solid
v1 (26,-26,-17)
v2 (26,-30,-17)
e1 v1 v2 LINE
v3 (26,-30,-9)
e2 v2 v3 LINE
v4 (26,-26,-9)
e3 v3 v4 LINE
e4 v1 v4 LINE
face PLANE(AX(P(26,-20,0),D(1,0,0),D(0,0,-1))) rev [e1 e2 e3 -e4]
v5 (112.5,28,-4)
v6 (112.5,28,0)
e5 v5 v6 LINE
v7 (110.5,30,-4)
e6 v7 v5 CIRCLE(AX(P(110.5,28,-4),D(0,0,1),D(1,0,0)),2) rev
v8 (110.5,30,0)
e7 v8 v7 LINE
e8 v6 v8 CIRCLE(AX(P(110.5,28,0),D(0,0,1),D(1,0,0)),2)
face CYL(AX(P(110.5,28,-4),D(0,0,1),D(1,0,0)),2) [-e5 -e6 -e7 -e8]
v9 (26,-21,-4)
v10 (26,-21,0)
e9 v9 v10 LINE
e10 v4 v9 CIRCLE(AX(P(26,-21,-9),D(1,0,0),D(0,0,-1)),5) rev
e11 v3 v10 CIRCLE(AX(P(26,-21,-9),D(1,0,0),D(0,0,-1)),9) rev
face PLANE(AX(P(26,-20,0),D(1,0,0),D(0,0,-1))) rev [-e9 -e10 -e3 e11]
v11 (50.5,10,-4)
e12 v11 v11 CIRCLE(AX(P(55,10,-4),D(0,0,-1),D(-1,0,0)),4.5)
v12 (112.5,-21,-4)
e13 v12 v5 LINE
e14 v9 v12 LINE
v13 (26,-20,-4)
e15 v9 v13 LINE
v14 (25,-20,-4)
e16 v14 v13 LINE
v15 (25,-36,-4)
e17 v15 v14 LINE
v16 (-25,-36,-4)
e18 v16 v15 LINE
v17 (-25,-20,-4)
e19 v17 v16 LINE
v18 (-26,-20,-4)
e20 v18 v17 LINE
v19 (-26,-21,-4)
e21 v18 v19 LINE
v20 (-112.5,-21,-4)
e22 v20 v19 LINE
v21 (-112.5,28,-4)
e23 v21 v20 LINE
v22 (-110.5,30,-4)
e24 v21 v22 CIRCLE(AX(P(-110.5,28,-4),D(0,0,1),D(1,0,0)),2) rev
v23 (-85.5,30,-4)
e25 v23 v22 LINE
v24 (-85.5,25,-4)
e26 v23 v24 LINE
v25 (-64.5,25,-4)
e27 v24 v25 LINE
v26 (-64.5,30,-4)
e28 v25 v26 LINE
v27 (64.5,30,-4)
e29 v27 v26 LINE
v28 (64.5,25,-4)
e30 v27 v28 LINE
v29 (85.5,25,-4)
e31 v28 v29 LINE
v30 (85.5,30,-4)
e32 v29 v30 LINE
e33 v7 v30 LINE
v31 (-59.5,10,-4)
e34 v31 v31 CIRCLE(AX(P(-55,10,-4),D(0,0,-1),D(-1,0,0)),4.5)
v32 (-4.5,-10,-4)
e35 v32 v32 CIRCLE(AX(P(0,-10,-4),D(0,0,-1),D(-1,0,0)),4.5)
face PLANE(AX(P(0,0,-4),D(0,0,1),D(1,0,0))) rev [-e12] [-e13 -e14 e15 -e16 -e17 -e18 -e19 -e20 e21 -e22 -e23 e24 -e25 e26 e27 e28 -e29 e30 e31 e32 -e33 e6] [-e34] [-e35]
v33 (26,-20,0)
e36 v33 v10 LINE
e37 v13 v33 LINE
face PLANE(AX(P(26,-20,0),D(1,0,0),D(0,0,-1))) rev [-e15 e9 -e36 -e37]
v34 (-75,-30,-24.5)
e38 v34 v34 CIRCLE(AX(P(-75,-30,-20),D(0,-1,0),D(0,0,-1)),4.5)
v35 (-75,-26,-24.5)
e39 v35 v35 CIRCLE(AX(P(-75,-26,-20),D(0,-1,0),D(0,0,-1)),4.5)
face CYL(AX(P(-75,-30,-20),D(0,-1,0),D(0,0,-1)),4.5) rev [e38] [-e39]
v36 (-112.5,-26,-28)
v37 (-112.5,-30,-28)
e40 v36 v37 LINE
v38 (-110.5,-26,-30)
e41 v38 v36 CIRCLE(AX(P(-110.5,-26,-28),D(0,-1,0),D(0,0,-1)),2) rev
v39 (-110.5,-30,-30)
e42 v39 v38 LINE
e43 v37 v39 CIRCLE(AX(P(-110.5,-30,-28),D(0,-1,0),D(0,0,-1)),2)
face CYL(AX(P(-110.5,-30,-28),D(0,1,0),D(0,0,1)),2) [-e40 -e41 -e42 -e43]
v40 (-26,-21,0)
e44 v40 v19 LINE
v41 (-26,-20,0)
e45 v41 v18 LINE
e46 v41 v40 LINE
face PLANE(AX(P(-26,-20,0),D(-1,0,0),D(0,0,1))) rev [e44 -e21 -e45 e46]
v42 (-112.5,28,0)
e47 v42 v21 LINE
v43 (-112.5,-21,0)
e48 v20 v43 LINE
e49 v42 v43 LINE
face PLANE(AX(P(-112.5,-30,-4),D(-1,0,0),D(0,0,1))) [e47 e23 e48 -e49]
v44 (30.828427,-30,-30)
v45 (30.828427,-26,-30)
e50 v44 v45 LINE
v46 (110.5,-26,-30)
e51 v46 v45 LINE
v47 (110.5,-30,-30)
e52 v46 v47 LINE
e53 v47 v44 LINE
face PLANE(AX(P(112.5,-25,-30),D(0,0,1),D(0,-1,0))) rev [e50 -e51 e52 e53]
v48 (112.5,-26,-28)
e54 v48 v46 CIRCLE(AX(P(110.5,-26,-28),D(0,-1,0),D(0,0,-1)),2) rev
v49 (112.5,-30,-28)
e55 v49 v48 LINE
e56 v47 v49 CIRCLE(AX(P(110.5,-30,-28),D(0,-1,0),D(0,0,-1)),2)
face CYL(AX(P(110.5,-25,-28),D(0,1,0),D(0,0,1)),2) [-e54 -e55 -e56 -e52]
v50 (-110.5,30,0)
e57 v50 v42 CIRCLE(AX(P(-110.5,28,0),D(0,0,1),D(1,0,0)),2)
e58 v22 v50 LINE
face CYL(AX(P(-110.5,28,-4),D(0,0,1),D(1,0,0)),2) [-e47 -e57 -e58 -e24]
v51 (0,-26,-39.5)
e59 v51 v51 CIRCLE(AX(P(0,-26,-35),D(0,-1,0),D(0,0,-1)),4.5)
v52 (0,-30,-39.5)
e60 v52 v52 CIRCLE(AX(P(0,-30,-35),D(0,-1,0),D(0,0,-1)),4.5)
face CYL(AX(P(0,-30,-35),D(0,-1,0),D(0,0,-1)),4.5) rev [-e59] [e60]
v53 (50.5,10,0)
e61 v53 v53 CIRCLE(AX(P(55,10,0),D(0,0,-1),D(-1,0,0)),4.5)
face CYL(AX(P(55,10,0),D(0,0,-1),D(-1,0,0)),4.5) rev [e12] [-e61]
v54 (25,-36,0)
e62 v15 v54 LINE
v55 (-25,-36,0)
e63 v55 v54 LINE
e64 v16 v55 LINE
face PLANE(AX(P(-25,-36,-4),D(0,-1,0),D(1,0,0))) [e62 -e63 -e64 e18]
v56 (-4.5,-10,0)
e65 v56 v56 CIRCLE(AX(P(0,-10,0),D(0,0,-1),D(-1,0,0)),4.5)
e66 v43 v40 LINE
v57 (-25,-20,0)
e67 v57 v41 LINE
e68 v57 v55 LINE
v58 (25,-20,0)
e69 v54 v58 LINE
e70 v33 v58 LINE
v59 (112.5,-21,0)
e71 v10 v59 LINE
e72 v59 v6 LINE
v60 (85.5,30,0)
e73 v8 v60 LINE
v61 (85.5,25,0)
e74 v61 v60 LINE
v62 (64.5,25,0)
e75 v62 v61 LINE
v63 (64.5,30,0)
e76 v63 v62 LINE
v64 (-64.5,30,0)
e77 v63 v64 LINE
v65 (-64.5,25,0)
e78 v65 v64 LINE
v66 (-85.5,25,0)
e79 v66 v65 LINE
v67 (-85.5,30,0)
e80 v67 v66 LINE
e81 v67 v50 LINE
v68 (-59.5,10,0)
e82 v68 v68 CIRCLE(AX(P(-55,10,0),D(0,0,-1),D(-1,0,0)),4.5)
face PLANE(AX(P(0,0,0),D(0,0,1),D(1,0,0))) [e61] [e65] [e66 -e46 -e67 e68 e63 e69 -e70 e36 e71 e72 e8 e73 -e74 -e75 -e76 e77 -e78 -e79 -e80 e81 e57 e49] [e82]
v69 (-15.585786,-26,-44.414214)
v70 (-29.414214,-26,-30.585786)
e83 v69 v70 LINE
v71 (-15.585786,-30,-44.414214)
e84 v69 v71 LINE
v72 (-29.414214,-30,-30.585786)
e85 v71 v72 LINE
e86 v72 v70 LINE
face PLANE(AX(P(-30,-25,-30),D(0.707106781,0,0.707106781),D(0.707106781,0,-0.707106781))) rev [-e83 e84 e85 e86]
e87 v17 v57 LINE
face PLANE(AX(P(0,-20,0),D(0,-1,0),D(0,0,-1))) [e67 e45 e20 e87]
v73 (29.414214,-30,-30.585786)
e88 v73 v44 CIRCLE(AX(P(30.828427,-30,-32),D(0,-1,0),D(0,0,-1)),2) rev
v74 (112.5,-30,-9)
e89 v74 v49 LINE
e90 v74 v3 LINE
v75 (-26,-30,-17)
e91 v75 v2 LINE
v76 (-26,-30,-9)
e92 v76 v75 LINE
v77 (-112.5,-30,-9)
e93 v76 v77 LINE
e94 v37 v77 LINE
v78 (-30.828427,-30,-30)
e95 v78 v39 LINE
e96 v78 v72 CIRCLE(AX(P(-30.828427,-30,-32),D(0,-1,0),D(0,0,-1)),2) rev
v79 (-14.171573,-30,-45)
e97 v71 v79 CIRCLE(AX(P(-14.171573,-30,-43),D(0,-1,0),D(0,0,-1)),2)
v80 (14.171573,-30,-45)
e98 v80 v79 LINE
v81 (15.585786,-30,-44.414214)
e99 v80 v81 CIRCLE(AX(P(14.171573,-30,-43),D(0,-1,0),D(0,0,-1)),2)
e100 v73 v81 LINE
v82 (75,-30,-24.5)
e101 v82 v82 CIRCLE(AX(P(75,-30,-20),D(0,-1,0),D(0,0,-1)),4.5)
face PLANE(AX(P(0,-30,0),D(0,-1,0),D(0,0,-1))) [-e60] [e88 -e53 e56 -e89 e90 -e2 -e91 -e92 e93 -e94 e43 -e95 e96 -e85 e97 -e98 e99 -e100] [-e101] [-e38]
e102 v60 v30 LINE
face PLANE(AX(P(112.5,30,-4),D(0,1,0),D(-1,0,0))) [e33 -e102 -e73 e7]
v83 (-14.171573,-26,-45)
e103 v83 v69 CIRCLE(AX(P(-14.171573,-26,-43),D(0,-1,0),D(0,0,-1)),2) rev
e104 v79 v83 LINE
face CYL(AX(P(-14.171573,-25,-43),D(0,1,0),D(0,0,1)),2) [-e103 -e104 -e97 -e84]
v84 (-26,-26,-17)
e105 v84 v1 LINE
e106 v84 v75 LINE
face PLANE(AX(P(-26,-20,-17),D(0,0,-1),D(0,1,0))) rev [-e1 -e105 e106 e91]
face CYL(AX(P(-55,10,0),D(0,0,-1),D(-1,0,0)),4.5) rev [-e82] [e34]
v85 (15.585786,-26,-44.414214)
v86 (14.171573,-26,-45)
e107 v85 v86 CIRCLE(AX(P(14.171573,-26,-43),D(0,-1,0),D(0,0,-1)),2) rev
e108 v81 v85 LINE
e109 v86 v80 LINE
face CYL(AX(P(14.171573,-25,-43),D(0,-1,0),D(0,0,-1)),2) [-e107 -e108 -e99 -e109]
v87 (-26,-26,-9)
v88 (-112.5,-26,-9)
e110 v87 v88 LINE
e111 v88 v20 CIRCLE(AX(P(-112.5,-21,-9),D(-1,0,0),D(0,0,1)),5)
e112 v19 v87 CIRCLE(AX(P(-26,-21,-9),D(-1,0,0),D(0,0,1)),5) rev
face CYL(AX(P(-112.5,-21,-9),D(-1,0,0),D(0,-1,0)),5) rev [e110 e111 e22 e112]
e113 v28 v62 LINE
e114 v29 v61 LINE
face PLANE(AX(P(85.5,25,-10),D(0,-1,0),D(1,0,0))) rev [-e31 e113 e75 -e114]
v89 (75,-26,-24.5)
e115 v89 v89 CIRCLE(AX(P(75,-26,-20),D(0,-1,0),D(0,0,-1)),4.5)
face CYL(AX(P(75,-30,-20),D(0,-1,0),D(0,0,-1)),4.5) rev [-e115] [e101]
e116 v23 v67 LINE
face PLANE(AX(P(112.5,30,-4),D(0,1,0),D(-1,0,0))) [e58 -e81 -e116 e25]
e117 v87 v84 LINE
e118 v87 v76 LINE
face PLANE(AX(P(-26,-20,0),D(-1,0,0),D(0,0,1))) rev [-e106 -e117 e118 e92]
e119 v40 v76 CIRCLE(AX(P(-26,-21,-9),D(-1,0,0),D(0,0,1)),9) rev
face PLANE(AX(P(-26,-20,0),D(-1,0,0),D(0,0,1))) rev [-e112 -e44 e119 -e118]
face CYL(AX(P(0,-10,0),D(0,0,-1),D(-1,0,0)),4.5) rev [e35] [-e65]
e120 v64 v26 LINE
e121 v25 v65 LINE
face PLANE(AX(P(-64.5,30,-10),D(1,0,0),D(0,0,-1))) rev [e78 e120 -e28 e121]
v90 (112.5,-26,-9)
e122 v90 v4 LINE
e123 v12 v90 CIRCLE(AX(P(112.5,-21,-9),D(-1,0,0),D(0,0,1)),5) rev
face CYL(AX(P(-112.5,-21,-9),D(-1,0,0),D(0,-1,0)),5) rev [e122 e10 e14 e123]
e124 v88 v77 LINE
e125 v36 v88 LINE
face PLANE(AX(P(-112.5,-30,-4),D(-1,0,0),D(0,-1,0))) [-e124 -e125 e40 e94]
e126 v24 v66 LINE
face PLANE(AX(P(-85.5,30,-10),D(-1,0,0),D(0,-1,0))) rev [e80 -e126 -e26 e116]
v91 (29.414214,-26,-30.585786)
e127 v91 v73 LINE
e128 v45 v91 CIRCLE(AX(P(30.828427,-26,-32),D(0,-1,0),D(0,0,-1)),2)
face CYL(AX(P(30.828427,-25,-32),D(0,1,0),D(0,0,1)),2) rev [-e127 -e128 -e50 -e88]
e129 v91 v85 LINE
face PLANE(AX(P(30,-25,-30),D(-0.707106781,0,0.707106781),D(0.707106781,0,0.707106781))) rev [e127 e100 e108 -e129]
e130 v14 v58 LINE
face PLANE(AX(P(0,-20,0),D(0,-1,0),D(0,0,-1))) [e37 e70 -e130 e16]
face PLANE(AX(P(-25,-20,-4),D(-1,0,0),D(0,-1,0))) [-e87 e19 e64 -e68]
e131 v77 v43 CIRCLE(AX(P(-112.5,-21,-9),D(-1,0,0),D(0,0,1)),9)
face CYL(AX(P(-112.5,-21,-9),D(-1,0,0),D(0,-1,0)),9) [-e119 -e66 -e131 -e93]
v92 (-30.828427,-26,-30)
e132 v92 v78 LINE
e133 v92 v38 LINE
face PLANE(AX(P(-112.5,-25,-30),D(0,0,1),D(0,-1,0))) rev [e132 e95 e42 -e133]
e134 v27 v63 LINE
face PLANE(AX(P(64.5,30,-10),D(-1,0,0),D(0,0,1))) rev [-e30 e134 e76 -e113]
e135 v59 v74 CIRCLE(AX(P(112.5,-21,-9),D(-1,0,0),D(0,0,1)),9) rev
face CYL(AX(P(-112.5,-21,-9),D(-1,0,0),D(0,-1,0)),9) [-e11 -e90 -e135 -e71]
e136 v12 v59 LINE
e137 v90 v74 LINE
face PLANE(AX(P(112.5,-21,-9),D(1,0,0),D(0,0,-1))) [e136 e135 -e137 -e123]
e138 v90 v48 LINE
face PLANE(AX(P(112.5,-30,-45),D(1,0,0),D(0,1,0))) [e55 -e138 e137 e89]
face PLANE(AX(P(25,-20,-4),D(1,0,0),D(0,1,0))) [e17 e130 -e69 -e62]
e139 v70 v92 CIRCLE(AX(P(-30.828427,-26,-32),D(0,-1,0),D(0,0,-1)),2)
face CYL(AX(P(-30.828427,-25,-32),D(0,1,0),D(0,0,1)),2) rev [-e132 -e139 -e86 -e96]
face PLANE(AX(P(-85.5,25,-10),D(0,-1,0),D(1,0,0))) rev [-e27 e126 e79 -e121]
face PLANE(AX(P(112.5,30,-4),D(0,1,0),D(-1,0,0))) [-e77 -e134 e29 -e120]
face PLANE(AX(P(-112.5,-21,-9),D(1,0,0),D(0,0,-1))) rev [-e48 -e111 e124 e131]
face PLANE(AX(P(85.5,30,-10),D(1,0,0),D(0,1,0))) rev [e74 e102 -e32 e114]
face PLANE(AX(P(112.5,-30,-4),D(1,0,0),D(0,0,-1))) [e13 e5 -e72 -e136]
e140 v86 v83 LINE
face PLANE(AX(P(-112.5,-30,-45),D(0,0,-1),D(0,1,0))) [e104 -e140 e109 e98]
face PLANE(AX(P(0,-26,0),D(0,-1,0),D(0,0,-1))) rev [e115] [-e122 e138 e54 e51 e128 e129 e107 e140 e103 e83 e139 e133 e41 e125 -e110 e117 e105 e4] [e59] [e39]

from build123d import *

# Parameters (mm, degrees)
SKETCH_6_W                       = 225
SKETCH_6_H                       = 60
SM_BASE_FLANGE_1_DEPTH           = 4
SM_EDGE_FLANGE_1_STRIP_W         = 26
SM_EDGE_FLANGE_1_STRIP_H         = 4
SM_EDGE_FLANGE_1_STRIP_CUT_DEPTH = 225
SM_EDGE_FLANGE_1_DEPTH           = 225
CUT_EXTRUDE_2_DEPTH              = 5
HOLE_WIZARD_M81_D                = 9
SKETCH_21_W                      = 52
SKETCH_21_H                      = 17
CUT_EXTRUDE_3_DEPTH              = 10
SKETCH_22_W                      = 50
SKETCH_22_H                      = 16
EXTRUDE_1_DEPTH                  = 4
SKETCH_23_W                      = 21
SKETCH_23_H                      = 5
CUT_EXTRUDE_4_DEPTH              = 10
SKETCH_26_R                      = 4.5
CUT_EXTRUDE_5_DEPTH              = 15
FILLET_1_R                       = 2


# Sheet-metal steps are written as plain solids
with BuildPart() as part:
    # Эскиз6 → Базовая кромка1 (new body)
    with BuildSketch(Plane.XY):
        Rectangle(SKETCH_6_W, SKETCH_6_H)
    extrude(amount=-SM_BASE_FLANGE_1_DEPTH)

    # Ребро-кромка1 strip (across the edge) → Ребро-кромка1 strip cut (cut)
    with BuildSketch(Plane(origin=(112.5, -30, -4), x_dir=(0, 1, 0), z_dir=(-1, 0, 0))):
        with Locations((-4, -2)):
            Rectangle(SM_EDGE_FLANGE_1_STRIP_W, SM_EDGE_FLANGE_1_STRIP_H)
    extrude(amount=SM_EDGE_FLANGE_1_STRIP_CUT_DEPTH, mode=Mode.SUBTRACT)

    # Ребро-кромка1 section (across the edge) → Ребро-кромка1 (add)
    with BuildSketch(Plane(origin=(112.5, -30, -4), x_dir=(0, 1, 0), z_dir=(-1, 0, 0))):
        with BuildLine():
            Line((0, 5), (0, 41))
            Line((0, 41), (4, 41))
            Line((4, 41), (4, 5))
            ThreePointArc((4, 5), (5.464466094, 1.464466094), (9, 0))
            Line((9, 0), (9, -4))
            ThreePointArc((9, -4), (2.636038969, -1.363961031), (0, 5))
        make_face()
    extrude(amount=SM_EDGE_FLANGE_1_DEPTH)

    # Эскиз15 → Вырез-Вытянуть2 (cut)
    with BuildSketch(Plane.XZ.offset(30)):
        Polygon((-112.5, -45), (-112.5, -30), (-30, -30), (-15, -45), align=None)
        Polygon((15, -45), (112.5, -45), (112.5, -30), (30, -30), align=None)
    extrude(amount=-CUT_EXTRUDE_2_DEPTH, mode=Mode.SUBTRACT)

    # Отверстие с зазором M81 (through all)
    with Locations(Plane(origin=(0, -30, 0), x_dir=(-1, 0, 0), z_dir=(0, -1, 0))):
        with Locations((-75, 20), (75, 20), (0, 35)):
            Hole(HOLE_WIZARD_M81_D / 2)

    # Эскиз21 → Вырез-Вытянуть3 (cut)
    with BuildSketch(Plane.XZ.offset(30)):
        with Locations((0, -8.5)):
            Rectangle(SKETCH_21_W, SKETCH_21_H)
    extrude(amount=-CUT_EXTRUDE_3_DEPTH, mode=Mode.SUBTRACT)

    # Эскиз22 → Бобышка-Вытянуть1 (add)
    with BuildSketch(Plane.XY):
        with Locations((0, -28)):
            Rectangle(SKETCH_22_W, SKETCH_22_H)
    extrude(amount=-EXTRUDE_1_DEPTH)

    # Эскиз23 → Вырез-Вытянуть4 (cut)
    with BuildSketch(Plane.XY):
        with Locations((-75, 27.5)):
            Rectangle(SKETCH_23_W, SKETCH_23_H)
        with Locations((75, 27.5)):
            Rectangle(SKETCH_23_W, SKETCH_23_H)
    extrude(amount=-CUT_EXTRUDE_4_DEPTH, mode=Mode.SUBTRACT)

    # Эскиз26 → Вырез-Вытянуть5 (cut)
    with BuildSketch(Plane(origin=(0, 0, -4), x_dir=(-1, 0, 0), z_dir=(0, 0, -1))):
        with Locations((-55, 10)):
            Circle(SKETCH_26_R)
        with Locations((55, 10)):
            Circle(SKETCH_26_R)
        with Locations((0, -10)):
            Circle(SKETCH_26_R)
    extrude(amount=-CUT_EXTRUDE_5_DEPTH, mode=Mode.SUBTRACT)

    # Скругление1
    fillet_1_edges = [part.edges().sort_by_distance(p)[0] for p in [
        (15, -28, -45),
        (-15, -28, -45),
        (-112.5, -28, -30),
        (-30, -28, -30),
        (30, -28, -30),
        (112.5, -28, -30),
        (-112.5, 30, -2),
        (112.5, 30, -2),
    ]]
    fillet(fillet_1_edges, radius=FILLET_1_R)


solid = part.part
